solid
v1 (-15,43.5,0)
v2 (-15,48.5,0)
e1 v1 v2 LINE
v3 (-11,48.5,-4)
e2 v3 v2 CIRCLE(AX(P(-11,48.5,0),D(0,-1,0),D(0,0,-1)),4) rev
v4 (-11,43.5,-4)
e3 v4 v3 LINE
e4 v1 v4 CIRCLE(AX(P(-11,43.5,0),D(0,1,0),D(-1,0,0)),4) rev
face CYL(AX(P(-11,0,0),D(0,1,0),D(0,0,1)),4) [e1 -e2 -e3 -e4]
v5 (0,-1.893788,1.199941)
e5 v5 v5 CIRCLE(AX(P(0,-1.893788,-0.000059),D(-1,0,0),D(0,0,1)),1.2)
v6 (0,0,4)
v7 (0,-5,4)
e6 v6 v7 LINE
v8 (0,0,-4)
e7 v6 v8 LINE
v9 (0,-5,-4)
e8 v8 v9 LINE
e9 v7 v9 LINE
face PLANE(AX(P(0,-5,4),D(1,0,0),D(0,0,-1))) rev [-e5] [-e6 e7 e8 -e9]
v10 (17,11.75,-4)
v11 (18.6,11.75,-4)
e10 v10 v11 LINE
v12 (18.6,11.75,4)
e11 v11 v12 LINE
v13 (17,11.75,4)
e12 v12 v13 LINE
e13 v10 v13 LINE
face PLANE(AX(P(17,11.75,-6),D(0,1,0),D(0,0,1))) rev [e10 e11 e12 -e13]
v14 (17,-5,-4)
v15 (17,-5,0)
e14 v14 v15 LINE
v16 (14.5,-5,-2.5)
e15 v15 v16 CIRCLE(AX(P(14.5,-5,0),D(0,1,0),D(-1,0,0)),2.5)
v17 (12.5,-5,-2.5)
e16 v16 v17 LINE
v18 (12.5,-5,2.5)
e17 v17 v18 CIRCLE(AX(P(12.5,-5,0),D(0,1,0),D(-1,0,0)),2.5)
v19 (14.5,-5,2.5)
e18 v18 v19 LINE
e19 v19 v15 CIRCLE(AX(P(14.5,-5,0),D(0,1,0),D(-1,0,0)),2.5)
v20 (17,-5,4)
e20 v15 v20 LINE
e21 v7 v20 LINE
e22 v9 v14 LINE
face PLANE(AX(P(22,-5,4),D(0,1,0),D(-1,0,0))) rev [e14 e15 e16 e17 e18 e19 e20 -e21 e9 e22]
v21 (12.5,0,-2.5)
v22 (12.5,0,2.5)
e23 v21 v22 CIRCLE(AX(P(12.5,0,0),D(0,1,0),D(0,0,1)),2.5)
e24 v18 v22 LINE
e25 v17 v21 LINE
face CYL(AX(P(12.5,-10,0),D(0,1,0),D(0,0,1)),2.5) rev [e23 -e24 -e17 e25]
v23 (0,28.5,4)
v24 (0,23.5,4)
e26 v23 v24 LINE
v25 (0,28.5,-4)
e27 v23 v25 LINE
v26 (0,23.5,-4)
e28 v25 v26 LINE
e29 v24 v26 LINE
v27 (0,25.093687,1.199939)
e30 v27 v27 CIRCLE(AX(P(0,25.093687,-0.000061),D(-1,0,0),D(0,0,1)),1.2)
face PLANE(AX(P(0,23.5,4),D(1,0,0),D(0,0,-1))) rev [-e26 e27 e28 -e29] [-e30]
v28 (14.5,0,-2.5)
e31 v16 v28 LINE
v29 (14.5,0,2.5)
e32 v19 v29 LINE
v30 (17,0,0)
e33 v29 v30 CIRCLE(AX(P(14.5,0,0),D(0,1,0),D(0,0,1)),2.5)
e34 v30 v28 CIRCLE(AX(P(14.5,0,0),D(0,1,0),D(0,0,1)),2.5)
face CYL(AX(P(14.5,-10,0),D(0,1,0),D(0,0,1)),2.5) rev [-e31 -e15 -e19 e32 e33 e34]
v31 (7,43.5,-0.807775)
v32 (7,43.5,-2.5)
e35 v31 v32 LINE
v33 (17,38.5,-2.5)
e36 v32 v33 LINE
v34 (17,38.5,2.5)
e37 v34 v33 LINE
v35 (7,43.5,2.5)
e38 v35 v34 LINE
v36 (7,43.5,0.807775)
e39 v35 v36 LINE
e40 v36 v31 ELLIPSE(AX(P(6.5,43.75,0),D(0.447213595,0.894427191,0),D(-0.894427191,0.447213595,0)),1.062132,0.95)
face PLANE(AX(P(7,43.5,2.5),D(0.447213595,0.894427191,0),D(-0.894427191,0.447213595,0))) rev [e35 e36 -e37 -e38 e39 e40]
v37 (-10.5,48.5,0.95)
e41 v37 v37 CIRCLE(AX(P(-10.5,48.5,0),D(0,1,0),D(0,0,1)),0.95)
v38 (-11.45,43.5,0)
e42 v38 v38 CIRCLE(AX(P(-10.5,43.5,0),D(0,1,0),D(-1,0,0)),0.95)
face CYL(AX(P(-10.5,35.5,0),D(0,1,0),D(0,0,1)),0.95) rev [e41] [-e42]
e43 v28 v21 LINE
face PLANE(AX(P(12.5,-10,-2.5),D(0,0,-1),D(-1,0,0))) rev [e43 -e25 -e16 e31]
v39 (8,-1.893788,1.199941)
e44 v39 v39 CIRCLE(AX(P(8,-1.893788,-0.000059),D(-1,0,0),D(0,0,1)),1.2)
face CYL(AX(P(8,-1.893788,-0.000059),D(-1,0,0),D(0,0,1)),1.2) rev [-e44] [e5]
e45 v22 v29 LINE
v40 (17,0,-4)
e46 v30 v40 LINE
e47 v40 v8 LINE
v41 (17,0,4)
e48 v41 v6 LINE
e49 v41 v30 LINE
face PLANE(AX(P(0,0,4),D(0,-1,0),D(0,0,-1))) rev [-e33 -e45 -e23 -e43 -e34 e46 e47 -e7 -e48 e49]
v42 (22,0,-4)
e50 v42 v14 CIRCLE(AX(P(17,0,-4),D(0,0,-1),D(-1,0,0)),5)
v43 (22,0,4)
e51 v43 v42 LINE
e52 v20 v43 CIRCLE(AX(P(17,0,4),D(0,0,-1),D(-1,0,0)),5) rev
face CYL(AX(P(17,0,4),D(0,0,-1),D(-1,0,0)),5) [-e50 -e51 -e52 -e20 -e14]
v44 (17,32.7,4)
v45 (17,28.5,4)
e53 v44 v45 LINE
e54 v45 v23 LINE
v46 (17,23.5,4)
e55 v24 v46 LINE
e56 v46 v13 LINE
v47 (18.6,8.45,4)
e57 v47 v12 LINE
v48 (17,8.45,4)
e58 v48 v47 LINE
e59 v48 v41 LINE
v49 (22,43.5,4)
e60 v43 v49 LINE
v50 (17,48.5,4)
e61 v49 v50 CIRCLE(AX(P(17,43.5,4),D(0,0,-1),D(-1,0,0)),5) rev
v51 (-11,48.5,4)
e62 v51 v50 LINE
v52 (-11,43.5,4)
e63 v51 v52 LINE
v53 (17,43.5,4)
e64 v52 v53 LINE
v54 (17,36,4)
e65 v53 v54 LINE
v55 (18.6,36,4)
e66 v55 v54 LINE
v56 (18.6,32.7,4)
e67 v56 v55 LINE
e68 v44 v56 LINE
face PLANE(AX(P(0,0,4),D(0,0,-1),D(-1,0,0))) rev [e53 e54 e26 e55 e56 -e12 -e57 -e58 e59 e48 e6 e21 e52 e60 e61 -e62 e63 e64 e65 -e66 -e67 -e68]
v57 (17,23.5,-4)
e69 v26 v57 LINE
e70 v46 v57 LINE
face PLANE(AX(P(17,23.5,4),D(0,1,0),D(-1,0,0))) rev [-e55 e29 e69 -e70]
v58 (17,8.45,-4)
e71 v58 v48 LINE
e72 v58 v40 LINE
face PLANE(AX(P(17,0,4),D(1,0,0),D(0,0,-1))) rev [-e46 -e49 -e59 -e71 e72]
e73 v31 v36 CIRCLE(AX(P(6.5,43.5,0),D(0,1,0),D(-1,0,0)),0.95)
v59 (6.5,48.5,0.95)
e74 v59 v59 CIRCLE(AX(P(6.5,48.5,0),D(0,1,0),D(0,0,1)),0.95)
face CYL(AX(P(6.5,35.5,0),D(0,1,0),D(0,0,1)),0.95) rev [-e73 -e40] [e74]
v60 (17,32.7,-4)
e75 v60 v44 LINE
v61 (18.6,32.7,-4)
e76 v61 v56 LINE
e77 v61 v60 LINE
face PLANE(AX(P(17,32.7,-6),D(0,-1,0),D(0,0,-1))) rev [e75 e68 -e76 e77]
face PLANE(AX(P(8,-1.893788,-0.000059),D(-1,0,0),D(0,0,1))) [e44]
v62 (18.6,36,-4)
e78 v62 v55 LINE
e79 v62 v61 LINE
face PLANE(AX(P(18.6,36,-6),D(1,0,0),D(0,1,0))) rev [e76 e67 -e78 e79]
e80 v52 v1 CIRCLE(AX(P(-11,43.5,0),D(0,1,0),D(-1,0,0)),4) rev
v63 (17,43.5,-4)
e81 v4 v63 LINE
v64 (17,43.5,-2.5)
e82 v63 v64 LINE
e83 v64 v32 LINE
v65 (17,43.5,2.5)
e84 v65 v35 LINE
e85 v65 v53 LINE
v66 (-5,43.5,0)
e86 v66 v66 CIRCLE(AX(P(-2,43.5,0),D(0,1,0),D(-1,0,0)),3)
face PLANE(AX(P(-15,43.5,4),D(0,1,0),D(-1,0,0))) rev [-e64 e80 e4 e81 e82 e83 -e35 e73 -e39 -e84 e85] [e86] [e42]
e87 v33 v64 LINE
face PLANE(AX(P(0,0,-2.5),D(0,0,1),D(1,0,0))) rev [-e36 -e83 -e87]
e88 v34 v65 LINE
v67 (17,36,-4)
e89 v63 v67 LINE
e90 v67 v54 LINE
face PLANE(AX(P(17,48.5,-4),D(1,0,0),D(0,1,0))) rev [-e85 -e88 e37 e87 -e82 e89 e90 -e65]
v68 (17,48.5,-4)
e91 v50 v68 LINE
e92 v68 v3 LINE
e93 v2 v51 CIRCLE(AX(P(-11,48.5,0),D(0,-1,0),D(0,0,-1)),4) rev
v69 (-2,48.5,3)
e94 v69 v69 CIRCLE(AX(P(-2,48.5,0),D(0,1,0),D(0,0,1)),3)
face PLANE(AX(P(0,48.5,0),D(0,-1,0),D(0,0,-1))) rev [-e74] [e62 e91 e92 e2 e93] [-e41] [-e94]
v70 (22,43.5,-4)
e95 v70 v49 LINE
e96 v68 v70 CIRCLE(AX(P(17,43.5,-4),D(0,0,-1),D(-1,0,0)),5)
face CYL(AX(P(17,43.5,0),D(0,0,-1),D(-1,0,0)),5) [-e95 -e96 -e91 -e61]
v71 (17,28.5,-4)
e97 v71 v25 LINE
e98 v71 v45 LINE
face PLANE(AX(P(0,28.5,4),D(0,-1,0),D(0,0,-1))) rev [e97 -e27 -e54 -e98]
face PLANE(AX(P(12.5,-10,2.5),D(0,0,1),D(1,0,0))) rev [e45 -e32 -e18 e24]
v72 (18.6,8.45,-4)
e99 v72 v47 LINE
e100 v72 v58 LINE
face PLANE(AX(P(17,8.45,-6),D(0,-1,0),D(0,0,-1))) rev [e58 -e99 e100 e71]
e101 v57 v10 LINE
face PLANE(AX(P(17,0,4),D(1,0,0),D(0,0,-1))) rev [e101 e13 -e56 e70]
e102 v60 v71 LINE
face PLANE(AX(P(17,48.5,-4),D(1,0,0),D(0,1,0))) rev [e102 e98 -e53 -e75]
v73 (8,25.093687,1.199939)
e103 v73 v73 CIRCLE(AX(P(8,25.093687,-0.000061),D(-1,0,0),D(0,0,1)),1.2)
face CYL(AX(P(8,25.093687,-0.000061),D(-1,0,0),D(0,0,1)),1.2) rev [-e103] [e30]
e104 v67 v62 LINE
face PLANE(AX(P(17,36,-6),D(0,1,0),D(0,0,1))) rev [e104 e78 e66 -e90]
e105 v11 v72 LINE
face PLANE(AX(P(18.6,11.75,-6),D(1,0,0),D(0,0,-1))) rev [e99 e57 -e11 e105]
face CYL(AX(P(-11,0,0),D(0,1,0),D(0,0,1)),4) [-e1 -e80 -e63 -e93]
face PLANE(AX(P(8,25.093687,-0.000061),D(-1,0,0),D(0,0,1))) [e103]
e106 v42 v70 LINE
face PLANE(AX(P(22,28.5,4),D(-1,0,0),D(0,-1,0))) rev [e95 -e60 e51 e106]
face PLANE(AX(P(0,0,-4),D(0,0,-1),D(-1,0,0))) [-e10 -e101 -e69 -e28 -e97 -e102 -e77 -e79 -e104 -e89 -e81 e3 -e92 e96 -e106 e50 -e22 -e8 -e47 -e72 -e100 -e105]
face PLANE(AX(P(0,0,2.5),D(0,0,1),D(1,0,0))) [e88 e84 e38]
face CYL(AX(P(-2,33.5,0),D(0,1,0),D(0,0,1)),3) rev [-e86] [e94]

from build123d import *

# Parameters (mm, degrees)
P_IDAT_VYSUNUT_M1_DEPTH  = 4
SKICA2_W                 = 5
SKICA2_H                 = 8
P_IDAT_VYSUNUT_M2_DEPTH  = 20
SKICA3_W                 = 8
SKICA3_H                 = 5
P_IDAT_VYSUNUT_M3_DEPTH  = 32
P_IDAT_VYSUNUT_M4_DEPTH  = 2.5
SKICA5_R                 = 3
ODEBRAT_VYSUNUT_M1_DEPTH = 15
ZAOBLIT1_R               = 5
SKICA6_R                 = 1.2
ODEBRAT_VYSUNUT_M2_DEPTH = 8
ZAOBLIT2_R               = 4
SKICA7_R                 = 0.95
ODEBRAT_VYSUNUT_M3_DEPTH = 13
ODEBRAT_VYSUNUT_M4_DEPTH = 10
SKICA9_W                 = 1.6
SKICA9_H                 = 3.3
ODEBRAT_VYSUNUT_M5_DEPTH = 10


with BuildPart() as part:
    # Skica1 → Přidat vysunutím1 (new, symmetric)
    with BuildSketch(Plane.XY):
        Polygon((0, 0), (17, 0), (17, 23.5), (0, 23.5), (0, 28.5), (22, 28.5), (22, -5), (0, -5), align=None)
    extrude(amount=P_IDAT_VYSUNUT_M1_DEPTH, both=True)

    # Skica2 → Přidat vysunutím2 (add)
    with BuildSketch(Plane(origin=(0, 28.5, 0), x_dir=(1, 0, 0), z_dir=(0, 1, 0))):
        with Locations((19.5, 0)):
            Rectangle(SKICA2_W, SKICA2_H)
    extrude(amount=P_IDAT_VYSUNUT_M2_DEPTH)

    # Skica3 → Přidat vysunutím3 (add)
    with BuildSketch(Plane.ZY.offset(-17)):
        with Locations((0, 46)):
            Rectangle(SKICA3_W, SKICA3_H)
    extrude(amount=P_IDAT_VYSUNUT_M3_DEPTH)

    # Skica4 → Přidat vysunutím4 (add, symmetric)
    with BuildSketch(Plane.XY):
        Polygon((17, 43.5), (7, 43.5), (17, 38.5), align=None)
    extrude(amount=P_IDAT_VYSUNUT_M4_DEPTH, both=True)

    # Skica5 → Odebrat vysunutím1 (cut)
    with BuildSketch(Plane(origin=(0, 48.5, 0), x_dir=(1, 0, 0), z_dir=(0, 1, 0))):
        with Locations(Location((-2, 0, 0), (0, 0, 270))):
            Circle(SKICA5_R)
    extrude(amount=-ODEBRAT_VYSUNUT_M1_DEPTH, mode=Mode.SUBTRACT)

    # Zaoblit1
    zaoblit1_edges = [part.edges().sort_by_distance(p)[0] for p in [
        (22, -5, 0),
        (22, 48.5, 0),
    ]]
    fillet(zaoblit1_edges, radius=ZAOBLIT1_R)

    # Skica6 → Odebrat vysunutím2 (cut)
    with BuildSketch(Plane.ZY):
        with Locations((-6.1415e-05, 25.09368658)):
            Circle(SKICA6_R)
        with Locations((-5.8558e-05, -1.893787552)):
            Circle(SKICA6_R)
    extrude(amount=-ODEBRAT_VYSUNUT_M2_DEPTH, mode=Mode.SUBTRACT)

    # Zaoblit2
    zaoblit2_edges = [part.edges().sort_by_distance(p)[0] for p in [
        (-15, 46, -4),
        (-15, 46, 4),
    ]]
    fillet(zaoblit2_edges, radius=ZAOBLIT2_R - 0.0001)  # a hair under: the kernel refuses the full size

    # Skica7 → Odebrat vysunutím3 (cut)
    with BuildSketch(Plane(origin=(0, 48.5, 0), x_dir=(1, 0, 0), z_dir=(0, 1, 0))):
        with Locations(Location((-10.5, 0, 0), (0, 0, 270))):
            Circle(SKICA7_R)
        with Locations(Location((6.5, 0, 0), (0, 0, 270))):
            Circle(SKICA7_R)
    extrude(amount=-ODEBRAT_VYSUNUT_M3_DEPTH, mode=Mode.SUBTRACT)

    # Skica8 → Odebrat vysunutím4 (cut)
    with BuildSketch(Plane(origin=(0, 0, 0), x_dir=(1, 0, 0), z_dir=(0, 1, 0))):
        with BuildLine():
            Line((12.5, 2.5), (14.5, 2.5))
            ThreePointArc((14.5, 2.5), (17, 0), (14.5, -2.5))
            Line((14.5, -2.5), (12.5, -2.5))
            ThreePointArc((12.5, -2.5), (10, 0), (12.5, 2.5))
        make_face()
    extrude(amount=-ODEBRAT_VYSUNUT_M4_DEPTH, mode=Mode.SUBTRACT)

    # Skica9 → Odebrat vysunutím5 (cut)
    with BuildSketch(Plane.XY.offset(4)):
        with Locations((17.8, 34.35)):
            Rectangle(SKICA9_W, SKICA9_H)
        with Locations((17.8, 10.1)):
            Rectangle(SKICA9_W, SKICA9_H)
    extrude(amount=-ODEBRAT_VYSUNUT_M5_DEPTH, mode=Mode.SUBTRACT)


solid = part.part
